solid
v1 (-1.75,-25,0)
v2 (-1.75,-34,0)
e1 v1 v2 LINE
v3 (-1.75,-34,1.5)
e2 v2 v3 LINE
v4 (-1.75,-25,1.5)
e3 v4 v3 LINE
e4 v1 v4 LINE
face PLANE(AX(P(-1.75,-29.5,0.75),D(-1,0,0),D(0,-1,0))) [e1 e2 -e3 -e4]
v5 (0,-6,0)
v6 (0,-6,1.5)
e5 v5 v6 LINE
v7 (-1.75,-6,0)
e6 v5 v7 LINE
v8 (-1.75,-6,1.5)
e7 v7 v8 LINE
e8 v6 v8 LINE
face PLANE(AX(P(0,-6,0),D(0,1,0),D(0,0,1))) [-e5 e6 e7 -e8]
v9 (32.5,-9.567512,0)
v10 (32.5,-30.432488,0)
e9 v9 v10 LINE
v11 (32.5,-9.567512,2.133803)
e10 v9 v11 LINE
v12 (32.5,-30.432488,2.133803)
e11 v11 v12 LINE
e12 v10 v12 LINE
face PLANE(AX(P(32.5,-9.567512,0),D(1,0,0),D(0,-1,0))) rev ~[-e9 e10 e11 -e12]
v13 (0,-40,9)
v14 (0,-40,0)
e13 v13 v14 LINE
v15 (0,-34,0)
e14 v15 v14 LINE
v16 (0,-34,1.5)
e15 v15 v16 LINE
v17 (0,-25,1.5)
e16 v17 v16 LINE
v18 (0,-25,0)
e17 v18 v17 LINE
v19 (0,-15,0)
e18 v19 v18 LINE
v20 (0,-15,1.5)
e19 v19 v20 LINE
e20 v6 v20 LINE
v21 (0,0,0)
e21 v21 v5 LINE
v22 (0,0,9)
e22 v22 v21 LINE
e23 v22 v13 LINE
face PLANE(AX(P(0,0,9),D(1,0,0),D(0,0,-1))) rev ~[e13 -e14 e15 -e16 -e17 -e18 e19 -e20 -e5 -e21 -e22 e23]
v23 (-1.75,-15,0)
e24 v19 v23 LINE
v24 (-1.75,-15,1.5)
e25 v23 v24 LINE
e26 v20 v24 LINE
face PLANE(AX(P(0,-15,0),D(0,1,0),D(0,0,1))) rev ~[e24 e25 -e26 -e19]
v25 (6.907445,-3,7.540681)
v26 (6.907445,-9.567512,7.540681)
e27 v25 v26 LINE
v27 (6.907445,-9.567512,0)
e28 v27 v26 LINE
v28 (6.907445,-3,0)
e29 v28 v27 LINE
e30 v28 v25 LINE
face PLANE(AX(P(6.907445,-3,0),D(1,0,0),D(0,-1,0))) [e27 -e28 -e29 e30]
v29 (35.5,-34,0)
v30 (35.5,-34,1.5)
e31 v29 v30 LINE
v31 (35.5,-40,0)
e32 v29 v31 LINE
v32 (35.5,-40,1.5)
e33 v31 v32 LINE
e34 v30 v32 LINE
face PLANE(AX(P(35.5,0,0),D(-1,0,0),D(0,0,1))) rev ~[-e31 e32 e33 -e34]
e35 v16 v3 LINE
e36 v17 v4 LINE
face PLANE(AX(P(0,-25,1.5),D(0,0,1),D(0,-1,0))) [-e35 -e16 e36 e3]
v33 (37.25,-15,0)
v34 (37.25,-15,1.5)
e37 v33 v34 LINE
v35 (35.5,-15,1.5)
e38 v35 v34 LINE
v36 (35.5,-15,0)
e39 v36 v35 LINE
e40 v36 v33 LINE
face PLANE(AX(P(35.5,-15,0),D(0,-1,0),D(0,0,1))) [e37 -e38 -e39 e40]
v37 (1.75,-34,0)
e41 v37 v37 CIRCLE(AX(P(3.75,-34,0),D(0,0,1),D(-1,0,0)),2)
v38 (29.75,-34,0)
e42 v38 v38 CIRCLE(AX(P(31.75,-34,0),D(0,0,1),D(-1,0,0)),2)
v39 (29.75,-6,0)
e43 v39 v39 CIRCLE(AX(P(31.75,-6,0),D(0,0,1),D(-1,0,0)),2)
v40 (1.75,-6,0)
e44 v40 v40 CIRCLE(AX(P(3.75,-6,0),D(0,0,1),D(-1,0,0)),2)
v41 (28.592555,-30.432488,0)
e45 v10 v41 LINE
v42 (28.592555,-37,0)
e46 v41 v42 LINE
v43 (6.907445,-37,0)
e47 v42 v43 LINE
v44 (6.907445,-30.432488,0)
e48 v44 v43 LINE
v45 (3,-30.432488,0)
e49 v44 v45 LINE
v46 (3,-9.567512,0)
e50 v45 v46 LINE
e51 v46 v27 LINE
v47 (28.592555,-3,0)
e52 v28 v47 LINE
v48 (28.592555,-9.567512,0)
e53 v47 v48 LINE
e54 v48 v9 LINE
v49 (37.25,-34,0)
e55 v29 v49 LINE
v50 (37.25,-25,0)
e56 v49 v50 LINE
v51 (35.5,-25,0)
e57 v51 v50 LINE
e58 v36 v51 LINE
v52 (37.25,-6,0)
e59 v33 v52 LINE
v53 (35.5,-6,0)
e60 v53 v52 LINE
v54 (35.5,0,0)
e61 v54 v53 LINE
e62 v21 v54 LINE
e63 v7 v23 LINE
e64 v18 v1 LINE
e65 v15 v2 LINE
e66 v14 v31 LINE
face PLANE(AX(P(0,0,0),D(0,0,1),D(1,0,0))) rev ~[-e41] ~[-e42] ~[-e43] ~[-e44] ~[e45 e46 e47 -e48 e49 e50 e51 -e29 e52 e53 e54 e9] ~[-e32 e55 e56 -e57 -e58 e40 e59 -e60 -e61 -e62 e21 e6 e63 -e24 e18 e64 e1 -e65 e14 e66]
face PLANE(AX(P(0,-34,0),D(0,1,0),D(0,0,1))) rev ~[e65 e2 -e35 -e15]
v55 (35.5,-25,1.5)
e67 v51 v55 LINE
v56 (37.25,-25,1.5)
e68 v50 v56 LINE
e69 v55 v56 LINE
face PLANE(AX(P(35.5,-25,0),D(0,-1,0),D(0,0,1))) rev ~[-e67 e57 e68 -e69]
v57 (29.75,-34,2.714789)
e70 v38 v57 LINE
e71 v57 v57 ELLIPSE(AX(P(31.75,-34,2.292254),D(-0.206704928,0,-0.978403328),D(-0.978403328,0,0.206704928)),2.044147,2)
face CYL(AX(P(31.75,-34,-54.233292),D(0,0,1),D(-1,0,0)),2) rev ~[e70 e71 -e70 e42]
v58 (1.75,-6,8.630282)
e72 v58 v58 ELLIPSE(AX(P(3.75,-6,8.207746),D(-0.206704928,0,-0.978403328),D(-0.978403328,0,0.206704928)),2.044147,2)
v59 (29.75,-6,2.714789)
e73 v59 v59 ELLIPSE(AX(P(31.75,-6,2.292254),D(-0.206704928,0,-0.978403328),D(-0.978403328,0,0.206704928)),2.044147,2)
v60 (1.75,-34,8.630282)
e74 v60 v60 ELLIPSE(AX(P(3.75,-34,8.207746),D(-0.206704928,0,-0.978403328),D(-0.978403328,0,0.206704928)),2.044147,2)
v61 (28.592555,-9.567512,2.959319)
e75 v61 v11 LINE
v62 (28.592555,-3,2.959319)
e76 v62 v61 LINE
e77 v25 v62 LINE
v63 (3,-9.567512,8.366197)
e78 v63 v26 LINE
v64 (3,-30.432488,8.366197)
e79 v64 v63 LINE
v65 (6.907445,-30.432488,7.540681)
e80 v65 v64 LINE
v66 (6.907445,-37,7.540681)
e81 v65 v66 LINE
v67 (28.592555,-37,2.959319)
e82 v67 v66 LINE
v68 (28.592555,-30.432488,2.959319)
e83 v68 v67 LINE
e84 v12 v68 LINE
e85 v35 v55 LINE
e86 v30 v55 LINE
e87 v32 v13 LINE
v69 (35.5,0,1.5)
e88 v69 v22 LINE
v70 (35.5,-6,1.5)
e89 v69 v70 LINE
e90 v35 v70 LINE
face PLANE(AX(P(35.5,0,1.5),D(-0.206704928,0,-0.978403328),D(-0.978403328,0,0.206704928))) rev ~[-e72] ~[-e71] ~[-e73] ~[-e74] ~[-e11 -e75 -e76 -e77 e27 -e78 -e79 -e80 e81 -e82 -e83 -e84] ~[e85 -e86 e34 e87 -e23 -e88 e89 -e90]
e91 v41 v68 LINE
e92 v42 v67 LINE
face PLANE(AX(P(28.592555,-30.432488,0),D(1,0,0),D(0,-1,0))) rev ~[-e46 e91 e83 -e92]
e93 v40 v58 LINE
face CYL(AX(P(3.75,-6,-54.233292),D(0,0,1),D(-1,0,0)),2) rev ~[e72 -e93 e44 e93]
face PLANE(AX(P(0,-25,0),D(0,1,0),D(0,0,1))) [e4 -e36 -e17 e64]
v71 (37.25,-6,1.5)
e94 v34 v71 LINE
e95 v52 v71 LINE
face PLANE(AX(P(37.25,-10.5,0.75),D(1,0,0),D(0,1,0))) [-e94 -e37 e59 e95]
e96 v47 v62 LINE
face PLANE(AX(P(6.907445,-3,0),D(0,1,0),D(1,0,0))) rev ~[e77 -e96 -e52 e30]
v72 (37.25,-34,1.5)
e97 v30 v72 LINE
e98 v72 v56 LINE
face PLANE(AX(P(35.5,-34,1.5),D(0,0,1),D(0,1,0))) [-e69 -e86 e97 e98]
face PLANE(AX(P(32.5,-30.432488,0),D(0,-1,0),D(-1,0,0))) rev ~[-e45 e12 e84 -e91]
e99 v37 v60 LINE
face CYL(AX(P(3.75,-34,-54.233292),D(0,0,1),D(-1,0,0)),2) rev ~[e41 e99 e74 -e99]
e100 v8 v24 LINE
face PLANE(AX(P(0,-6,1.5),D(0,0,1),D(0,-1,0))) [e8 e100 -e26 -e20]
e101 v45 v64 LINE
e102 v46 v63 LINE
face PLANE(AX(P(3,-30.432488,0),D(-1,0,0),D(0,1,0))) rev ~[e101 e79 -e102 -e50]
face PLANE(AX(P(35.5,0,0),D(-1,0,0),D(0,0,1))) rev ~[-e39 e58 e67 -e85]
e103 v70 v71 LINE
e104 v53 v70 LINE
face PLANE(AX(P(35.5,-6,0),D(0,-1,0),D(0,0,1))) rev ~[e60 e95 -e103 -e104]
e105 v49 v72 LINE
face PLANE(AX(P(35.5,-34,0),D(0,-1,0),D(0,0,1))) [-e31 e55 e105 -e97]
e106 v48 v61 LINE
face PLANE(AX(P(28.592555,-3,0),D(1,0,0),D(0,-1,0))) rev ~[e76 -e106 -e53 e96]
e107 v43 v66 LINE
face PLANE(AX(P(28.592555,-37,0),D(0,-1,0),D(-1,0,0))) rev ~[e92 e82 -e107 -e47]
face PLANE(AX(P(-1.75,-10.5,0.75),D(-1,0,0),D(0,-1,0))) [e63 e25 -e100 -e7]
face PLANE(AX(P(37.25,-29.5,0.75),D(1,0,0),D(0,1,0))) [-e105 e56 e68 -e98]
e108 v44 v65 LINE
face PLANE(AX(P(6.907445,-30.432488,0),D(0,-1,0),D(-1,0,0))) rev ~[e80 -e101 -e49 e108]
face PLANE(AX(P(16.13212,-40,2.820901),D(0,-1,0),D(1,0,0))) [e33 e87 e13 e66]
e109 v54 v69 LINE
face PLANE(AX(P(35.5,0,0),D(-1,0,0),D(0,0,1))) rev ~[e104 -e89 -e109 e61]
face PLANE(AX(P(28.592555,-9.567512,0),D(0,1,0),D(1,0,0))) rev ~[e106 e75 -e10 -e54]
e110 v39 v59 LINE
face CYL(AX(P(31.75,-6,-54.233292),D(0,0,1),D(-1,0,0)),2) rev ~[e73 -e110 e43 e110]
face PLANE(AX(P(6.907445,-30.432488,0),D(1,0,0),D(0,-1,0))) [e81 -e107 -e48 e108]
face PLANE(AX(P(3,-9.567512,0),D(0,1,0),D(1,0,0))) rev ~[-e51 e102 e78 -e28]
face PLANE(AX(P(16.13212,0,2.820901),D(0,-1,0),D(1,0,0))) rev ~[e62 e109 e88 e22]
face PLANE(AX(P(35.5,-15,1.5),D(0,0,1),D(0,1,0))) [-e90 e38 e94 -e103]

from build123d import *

# Parameters (mm, degrees)
F1_DEPTH = 40
F3_D     = 4
F4_W     = 9
F4_H     = 1.5
F5_DEPTH = 1.75
F6_W     = 9
F6_H     = 1.5
F7_DEPTH = 1.75
F8_W     = 10.8425548855
F8_H     = 10.4324881697
F8_W_2   = 3.9074451145
F8_H_2   = 6.5675118303
F9_DEPTH = 9.001


with BuildPart() as f1:
    # F0 (on Front) → F1 (new body)
    with BuildSketch(Plane.XZ):
        Polygon((0, 9), (0, 0), (35.5, 0), (35.5, 1.5), align=None)
    extrude(amount=F1_DEPTH)

    # F3 (through all)
    with Locations(Plane(origin=(0, 0, 0), x_dir=(1, 0, 0), z_dir=(0, 0, -1))):
        with Locations((3.75, 34), (31.75, 34), (31.75, 6), (3.75, 6)):
            Hole(F3_D / 2)

    # F4 (on face) → F5 (join)
    with BuildSketch(Plane(origin=(0, 0, 0), x_dir=(0, -1, 0), z_dir=(-1, 0, 0))):
        with Locations((29.5, 0.75)):
            Rectangle(F4_W, F4_H)
        with Locations((10.5, 0.75)):
            Rectangle(F4_W, F4_H)
    extrude(amount=F5_DEPTH)

    # F6 (on face) → F7 (join)
    with BuildSketch(Plane.YZ.offset(35.5)):
        with Locations((-10.5, 0.75)):
            Rectangle(F6_W, F6_H)
        with Locations((-29.5, 0.75)):
            Rectangle(F6_W, F6_H)
    extrude(amount=F7_DEPTH)

    # F8 (on face) → F9 (cut, through all)
    with BuildSketch(Plane(origin=(0, 0, 0), x_dir=(1, 0, 0), z_dir=(0, 0, -1))):
        with Locations((23.1712774428, 25.2162440849)):
            Rectangle(F8_W, F8_H)
        with Locations((12.3287225572, 14.7837559151)):
            Rectangle(F8_W, F8_H)
        with Locations((12.3287225572, 25.2162440849)):
            Rectangle(F8_W, F8_H)
        with Locations((23.1712774428, 14.7837559151)):
            Rectangle(F8_W, F8_H)
        with Locations((30.5462774428, 25.2162440849)):
            Rectangle(F8_W_2, F8_H)
        with Locations((30.5462774428, 14.7837559151)):
            Rectangle(F8_W_2, F8_H)
        with Locations((4.9537225572, 14.7837559151)):
            Rectangle(F8_W_2, F8_H)
        with Locations((4.9537225572, 25.2162440849)):
            Rectangle(F8_W_2, F8_H)
        with Locations((12.3287225572, 33.7162440849)):
            Rectangle(F8_W, F8_H_2)
        with Locations((23.1712774428, 33.7162440849)):
            Rectangle(F8_W, F8_H_2)
        with Locations((23.1712774428, 6.2837559151)):
            Rectangle(F8_W, F8_H_2)
        with Locations((12.3287225572, 6.2837559151)):
            Rectangle(F8_W, F8_H_2)
    extrude(amount=-F9_DEPTH, mode=Mode.SUBTRACT)


solid = f1.part
